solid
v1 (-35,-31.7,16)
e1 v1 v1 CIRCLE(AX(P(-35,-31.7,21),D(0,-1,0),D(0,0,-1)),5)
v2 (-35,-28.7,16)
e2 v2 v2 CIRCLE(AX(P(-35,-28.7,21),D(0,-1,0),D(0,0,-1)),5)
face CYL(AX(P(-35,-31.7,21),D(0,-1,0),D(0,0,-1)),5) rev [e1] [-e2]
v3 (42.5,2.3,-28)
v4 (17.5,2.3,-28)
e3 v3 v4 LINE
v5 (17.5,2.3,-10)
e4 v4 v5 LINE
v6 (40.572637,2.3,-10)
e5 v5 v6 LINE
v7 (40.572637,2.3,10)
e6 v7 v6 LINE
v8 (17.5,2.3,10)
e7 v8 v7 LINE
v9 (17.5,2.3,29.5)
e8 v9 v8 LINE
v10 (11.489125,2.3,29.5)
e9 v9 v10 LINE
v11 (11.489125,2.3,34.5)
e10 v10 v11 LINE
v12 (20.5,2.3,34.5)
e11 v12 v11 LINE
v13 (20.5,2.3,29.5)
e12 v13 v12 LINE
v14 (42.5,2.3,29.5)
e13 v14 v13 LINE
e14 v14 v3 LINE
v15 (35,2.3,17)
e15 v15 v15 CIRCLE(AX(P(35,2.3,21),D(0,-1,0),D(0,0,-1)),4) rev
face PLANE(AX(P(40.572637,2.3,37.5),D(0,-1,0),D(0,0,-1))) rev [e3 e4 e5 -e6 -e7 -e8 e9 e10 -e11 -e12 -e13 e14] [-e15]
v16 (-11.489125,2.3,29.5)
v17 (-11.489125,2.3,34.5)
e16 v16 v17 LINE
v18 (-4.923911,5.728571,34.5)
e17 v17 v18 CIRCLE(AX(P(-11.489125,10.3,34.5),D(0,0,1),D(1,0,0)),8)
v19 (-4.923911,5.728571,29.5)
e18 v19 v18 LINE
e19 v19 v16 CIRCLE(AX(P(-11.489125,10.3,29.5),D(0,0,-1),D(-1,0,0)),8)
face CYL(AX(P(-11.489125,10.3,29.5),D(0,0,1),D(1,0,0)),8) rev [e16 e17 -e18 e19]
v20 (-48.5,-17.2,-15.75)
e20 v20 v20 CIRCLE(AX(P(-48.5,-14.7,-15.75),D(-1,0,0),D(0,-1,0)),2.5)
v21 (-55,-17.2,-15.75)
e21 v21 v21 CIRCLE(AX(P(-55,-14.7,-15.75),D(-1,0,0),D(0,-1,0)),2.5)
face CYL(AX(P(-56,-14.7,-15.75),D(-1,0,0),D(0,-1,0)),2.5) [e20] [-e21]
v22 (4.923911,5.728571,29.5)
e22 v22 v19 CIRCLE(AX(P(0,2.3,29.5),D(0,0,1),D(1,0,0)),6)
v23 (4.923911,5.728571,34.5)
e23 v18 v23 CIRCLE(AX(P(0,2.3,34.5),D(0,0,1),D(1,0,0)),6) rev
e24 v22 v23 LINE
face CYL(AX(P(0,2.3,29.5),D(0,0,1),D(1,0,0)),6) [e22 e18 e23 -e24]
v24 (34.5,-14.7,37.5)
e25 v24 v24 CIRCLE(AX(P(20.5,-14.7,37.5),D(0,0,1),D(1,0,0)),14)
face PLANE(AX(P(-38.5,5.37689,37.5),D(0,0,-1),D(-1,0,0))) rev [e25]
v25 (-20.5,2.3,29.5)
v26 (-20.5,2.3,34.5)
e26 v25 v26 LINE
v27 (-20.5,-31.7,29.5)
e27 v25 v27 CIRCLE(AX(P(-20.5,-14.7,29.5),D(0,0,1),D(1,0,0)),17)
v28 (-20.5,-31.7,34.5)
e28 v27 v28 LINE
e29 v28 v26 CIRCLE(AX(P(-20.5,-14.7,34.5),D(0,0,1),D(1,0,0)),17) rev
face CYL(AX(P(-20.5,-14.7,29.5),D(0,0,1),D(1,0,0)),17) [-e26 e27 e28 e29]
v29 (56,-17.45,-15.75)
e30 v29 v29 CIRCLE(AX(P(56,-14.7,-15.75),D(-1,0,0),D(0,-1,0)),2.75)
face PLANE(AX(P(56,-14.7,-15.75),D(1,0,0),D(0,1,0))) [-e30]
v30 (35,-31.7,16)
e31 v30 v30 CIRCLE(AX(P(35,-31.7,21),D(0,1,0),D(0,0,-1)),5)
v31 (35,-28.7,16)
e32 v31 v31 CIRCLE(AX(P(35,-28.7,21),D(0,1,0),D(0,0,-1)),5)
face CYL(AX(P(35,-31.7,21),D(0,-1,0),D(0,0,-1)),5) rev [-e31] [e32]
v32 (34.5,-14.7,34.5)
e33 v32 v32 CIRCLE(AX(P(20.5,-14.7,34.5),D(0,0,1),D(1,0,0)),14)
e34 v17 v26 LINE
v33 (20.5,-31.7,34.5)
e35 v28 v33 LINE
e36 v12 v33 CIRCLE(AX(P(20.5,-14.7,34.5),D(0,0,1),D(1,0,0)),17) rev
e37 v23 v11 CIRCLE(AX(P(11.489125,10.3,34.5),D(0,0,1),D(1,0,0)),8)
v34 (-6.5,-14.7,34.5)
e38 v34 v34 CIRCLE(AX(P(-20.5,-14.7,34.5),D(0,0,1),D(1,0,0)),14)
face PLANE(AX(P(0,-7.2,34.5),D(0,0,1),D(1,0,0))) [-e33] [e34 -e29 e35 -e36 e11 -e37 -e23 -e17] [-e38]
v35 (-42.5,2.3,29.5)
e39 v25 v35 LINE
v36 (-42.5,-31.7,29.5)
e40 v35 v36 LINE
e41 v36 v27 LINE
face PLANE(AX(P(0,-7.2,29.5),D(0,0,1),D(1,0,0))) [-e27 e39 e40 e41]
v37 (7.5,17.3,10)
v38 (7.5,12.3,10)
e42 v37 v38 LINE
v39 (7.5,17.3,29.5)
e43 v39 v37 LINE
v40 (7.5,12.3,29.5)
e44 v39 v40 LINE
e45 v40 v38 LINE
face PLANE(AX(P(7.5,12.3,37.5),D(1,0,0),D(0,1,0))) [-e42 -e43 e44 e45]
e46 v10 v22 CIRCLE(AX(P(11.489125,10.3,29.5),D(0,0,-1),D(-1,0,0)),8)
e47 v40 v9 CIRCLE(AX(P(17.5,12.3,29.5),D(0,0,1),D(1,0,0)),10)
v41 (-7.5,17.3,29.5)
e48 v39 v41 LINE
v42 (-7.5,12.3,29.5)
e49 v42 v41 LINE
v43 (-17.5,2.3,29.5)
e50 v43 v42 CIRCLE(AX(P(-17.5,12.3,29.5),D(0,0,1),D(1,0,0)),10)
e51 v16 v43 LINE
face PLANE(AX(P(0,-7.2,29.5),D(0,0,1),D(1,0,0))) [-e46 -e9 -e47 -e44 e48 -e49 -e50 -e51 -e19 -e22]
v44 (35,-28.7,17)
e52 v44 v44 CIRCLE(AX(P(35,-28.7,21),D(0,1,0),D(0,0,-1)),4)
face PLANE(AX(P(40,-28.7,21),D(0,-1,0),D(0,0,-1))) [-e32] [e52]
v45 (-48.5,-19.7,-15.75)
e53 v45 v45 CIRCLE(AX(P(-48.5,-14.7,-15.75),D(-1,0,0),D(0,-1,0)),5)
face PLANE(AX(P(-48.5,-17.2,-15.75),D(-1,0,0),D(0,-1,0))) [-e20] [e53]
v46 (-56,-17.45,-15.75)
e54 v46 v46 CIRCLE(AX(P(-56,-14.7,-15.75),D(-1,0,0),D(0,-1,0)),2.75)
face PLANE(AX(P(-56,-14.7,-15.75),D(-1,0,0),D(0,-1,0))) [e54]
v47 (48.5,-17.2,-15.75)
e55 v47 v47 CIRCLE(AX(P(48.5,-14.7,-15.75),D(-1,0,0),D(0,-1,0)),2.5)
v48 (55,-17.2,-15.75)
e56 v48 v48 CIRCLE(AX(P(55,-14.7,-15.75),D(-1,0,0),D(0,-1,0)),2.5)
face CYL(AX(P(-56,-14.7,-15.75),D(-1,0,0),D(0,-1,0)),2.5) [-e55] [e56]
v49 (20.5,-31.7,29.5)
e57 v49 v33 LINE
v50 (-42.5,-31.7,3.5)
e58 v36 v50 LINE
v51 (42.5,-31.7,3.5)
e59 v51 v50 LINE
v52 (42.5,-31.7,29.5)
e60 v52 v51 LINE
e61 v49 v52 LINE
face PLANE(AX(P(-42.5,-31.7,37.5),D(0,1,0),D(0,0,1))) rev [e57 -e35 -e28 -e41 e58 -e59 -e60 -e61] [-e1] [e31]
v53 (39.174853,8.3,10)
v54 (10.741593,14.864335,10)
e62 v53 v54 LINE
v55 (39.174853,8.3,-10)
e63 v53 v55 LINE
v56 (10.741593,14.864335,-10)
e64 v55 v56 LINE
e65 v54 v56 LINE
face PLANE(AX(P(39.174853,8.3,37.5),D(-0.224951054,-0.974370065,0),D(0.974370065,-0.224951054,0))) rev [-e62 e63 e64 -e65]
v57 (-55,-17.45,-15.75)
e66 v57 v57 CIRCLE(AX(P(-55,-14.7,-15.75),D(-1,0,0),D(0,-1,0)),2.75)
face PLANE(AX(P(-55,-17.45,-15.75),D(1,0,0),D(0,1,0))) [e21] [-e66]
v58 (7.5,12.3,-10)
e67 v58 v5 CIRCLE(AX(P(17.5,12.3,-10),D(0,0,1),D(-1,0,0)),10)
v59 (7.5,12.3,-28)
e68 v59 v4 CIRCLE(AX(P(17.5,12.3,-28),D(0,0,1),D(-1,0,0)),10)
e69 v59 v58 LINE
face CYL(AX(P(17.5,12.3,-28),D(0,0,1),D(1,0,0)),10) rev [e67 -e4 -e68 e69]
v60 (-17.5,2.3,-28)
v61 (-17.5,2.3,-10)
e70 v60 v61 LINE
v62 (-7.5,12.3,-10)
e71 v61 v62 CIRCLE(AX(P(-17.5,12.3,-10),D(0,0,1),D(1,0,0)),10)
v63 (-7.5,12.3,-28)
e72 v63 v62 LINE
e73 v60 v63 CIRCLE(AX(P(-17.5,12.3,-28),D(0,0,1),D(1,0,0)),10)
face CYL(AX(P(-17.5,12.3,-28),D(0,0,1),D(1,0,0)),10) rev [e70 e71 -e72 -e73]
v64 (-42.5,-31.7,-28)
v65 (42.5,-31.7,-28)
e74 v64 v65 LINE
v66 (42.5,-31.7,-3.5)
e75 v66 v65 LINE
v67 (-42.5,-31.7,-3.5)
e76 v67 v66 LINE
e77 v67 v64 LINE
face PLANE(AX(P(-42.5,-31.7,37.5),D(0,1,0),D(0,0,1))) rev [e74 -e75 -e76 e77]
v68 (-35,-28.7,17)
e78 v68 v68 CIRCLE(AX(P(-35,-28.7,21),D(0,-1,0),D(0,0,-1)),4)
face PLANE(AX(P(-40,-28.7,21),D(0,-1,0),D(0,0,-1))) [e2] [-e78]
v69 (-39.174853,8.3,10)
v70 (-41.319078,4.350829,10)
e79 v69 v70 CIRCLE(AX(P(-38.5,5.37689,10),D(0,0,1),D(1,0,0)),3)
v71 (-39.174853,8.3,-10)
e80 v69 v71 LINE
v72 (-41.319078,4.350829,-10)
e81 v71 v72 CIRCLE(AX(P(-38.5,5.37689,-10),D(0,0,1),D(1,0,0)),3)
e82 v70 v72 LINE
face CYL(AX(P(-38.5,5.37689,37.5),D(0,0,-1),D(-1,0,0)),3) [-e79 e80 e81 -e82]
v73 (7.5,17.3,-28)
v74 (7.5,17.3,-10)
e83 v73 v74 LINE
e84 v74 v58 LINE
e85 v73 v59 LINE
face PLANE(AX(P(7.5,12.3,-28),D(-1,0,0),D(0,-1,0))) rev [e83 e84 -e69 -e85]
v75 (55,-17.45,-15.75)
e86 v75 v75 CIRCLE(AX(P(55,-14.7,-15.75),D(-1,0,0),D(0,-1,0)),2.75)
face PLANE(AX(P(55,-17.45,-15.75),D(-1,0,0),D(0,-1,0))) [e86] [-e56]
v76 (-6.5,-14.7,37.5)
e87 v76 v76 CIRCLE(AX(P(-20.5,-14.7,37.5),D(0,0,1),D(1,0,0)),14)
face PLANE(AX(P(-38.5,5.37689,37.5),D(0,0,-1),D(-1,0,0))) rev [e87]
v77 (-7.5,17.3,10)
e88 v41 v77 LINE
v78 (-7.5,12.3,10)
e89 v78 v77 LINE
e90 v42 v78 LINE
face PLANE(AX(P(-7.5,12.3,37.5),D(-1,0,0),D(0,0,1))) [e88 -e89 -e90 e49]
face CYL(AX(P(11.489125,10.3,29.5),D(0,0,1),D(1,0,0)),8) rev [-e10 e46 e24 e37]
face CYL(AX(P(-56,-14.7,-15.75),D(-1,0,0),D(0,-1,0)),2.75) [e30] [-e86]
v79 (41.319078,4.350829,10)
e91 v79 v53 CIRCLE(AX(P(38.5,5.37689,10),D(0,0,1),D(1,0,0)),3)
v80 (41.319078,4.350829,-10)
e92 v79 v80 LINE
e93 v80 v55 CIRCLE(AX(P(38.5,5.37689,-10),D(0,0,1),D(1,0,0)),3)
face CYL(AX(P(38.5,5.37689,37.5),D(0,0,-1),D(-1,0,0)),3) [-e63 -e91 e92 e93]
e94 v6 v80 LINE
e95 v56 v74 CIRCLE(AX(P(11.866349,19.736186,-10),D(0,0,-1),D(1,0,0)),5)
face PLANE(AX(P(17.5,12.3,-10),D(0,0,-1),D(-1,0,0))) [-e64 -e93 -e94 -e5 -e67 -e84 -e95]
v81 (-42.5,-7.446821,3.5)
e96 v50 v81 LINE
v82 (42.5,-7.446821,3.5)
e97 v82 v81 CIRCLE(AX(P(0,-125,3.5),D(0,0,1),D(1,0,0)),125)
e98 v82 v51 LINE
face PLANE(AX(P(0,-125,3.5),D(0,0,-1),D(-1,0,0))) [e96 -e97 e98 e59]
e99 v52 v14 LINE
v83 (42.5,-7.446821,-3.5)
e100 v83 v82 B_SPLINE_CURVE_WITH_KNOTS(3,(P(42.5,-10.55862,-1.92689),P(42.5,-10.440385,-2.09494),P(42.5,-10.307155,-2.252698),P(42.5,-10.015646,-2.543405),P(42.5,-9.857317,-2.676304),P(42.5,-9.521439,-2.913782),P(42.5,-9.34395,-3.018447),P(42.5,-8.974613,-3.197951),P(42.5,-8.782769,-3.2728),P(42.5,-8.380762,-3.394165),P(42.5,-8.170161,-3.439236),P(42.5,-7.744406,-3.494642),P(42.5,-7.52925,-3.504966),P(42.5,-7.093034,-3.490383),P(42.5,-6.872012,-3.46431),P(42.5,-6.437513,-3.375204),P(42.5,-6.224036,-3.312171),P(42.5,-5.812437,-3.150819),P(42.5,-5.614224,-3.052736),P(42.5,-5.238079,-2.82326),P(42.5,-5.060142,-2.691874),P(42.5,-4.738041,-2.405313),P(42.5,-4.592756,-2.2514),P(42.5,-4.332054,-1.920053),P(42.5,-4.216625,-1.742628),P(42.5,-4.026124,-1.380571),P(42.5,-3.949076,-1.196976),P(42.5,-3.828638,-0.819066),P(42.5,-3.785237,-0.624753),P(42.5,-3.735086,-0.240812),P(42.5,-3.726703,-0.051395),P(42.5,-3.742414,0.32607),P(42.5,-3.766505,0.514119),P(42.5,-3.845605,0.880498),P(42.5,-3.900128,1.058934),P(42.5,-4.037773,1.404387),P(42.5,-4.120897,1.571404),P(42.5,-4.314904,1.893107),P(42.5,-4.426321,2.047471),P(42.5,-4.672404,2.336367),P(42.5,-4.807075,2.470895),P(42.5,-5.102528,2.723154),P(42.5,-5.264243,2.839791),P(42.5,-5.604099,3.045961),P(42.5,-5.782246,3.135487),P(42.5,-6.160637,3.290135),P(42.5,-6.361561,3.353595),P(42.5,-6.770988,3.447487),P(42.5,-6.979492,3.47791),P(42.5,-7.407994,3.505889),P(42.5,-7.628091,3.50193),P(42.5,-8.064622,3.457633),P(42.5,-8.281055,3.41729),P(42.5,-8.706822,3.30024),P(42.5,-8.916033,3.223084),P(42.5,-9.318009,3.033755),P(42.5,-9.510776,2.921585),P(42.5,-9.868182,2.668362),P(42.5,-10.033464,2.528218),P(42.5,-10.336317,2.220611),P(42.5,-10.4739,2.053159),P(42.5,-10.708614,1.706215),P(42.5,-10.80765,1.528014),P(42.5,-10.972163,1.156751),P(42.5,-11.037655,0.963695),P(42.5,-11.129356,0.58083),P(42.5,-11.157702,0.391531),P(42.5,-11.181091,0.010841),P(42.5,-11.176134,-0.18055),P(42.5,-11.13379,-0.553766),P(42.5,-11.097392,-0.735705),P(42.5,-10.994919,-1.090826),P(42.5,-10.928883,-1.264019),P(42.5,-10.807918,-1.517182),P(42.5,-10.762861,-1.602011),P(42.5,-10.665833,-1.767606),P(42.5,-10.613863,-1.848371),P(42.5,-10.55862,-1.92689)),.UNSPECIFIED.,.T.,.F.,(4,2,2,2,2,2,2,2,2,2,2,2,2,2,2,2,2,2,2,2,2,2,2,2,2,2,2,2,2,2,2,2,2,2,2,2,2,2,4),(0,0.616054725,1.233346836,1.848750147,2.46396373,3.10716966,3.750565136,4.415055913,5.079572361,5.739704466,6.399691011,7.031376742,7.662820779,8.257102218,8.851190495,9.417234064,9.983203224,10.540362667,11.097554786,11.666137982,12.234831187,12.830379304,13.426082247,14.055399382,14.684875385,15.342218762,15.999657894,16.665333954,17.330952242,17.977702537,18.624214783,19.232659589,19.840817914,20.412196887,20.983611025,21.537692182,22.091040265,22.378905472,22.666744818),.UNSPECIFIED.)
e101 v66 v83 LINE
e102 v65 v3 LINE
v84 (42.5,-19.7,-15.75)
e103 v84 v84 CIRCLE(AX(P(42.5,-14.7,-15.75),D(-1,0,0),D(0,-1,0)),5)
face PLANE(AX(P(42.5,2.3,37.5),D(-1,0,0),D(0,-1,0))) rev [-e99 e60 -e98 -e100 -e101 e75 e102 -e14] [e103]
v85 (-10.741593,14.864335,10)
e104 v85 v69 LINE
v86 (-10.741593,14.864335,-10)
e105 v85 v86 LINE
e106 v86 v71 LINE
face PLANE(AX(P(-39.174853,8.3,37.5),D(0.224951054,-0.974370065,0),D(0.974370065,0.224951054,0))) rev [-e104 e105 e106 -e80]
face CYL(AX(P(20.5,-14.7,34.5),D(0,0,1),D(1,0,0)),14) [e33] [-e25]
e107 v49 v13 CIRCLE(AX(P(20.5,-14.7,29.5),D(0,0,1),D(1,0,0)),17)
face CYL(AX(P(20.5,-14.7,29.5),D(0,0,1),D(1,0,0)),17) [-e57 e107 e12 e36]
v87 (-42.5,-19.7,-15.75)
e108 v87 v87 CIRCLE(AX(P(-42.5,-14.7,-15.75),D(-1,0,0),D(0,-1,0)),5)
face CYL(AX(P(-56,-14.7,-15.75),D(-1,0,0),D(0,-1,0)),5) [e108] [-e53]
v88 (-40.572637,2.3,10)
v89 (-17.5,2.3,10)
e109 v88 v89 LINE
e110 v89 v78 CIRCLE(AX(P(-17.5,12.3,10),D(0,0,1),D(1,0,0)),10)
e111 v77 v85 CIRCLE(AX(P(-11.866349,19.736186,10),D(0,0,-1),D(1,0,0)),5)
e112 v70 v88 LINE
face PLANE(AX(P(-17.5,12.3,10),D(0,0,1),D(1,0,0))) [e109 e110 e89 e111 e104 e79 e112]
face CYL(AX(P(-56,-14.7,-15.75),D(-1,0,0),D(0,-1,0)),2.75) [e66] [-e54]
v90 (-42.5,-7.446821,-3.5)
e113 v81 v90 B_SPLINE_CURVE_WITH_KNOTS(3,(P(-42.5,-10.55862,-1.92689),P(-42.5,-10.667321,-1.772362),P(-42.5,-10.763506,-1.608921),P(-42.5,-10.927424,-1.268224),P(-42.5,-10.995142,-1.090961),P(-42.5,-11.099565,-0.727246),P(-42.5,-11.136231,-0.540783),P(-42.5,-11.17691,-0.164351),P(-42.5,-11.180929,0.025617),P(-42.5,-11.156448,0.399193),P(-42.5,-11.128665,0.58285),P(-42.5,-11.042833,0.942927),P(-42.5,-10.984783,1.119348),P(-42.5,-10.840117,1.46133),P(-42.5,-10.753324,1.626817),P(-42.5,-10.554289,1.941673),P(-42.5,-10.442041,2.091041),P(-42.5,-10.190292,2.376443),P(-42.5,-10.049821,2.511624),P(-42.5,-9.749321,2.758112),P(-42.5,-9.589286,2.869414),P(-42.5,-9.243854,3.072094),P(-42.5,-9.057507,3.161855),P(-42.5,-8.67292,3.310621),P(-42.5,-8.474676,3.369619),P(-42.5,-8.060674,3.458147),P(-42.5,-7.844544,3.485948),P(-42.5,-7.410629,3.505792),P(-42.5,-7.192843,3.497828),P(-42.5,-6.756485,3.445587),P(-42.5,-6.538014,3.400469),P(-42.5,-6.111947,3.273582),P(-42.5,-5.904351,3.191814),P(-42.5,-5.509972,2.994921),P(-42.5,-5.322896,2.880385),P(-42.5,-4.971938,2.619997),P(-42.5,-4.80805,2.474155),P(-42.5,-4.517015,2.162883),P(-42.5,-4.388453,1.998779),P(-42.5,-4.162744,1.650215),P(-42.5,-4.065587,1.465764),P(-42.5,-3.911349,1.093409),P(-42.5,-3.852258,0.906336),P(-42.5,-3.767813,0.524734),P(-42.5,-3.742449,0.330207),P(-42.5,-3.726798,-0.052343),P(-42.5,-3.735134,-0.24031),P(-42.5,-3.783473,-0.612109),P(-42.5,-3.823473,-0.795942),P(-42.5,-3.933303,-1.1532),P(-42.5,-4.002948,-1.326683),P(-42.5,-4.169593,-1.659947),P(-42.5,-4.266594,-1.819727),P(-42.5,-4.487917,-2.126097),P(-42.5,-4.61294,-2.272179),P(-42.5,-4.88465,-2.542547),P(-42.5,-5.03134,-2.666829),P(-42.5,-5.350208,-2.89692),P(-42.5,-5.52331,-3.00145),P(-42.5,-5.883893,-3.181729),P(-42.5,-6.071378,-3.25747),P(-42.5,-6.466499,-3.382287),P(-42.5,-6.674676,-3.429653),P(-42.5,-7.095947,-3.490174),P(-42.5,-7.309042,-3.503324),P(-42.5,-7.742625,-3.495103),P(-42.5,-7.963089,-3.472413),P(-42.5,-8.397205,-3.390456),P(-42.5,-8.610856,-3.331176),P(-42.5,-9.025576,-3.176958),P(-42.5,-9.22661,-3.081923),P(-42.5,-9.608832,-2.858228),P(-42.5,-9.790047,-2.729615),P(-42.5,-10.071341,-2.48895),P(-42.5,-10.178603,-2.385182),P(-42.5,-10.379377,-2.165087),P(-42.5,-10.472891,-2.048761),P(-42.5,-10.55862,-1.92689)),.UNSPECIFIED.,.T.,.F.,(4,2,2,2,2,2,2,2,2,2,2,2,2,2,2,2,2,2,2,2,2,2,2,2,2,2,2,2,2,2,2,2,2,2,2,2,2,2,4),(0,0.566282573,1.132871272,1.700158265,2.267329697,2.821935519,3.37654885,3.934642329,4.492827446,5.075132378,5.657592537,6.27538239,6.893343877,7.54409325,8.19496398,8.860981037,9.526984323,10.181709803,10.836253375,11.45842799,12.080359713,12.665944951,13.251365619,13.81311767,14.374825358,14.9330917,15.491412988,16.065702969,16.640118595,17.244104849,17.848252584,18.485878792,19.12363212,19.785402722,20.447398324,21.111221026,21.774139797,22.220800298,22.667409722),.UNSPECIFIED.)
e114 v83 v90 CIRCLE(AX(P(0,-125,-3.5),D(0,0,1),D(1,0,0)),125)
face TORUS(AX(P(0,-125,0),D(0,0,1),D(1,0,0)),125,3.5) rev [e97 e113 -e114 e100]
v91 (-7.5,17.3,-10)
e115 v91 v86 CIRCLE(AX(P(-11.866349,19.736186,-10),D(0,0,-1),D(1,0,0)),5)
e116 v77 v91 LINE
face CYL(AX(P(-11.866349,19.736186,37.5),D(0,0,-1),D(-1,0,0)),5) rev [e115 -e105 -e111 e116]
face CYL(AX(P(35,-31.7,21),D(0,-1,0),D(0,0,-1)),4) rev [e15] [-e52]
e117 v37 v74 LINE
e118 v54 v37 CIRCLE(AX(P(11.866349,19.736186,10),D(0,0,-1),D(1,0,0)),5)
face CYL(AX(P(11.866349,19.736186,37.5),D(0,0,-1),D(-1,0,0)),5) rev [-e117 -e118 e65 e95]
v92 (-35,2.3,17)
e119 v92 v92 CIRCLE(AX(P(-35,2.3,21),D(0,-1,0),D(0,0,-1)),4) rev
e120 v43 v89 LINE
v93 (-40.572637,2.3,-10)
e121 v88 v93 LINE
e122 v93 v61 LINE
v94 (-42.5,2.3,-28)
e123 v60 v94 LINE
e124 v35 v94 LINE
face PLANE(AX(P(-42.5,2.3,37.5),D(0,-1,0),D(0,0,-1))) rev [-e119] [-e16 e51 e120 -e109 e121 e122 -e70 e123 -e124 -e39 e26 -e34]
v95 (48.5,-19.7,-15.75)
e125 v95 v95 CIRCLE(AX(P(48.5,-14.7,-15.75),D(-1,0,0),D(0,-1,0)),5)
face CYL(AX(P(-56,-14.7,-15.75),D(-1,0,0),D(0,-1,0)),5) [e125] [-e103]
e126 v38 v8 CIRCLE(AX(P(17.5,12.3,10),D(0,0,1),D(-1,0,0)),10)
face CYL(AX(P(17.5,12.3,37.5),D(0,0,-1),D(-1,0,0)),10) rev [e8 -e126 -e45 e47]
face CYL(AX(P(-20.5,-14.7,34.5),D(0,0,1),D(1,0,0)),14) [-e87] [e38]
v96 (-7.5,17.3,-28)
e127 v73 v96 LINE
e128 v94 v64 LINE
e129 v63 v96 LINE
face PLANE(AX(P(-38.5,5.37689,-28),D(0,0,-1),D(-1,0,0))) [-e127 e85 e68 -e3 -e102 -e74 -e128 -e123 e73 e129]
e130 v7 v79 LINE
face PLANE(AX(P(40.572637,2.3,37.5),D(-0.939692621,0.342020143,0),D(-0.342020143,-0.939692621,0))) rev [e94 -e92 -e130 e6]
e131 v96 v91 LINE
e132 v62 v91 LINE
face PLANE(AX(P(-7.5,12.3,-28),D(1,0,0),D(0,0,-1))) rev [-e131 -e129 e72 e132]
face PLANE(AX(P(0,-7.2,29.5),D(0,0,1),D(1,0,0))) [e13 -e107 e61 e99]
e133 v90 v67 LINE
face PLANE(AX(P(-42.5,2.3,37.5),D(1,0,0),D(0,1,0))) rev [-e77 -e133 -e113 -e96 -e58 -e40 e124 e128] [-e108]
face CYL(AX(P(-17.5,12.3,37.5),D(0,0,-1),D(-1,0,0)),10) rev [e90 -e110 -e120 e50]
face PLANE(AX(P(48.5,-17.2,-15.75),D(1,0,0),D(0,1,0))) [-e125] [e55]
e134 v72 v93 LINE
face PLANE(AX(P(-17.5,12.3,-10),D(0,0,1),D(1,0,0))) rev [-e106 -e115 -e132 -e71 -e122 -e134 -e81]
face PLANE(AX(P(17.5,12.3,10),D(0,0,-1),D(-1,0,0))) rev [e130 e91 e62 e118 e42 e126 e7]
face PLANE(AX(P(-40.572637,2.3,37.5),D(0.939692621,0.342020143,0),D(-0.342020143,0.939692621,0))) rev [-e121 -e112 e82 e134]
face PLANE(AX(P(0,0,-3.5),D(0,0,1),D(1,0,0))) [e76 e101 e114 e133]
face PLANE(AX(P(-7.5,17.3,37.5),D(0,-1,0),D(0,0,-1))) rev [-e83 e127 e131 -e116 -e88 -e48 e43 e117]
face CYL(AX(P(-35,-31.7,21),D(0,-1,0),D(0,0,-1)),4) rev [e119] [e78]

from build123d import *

# Parameters (mm, degrees)
BOSS_EXTRUDE1_DEPTH      = 37.5
BOSS_EXTRUDE1_DEPTH_BACK = 28
CUT_EXTRUDE2_START       = -28
CUT_EXTRUDE2_DEPTH       = 18
CUT_EXTRUDE3_START       = 10
CUT_EXTRUDE3_DEPTH       = 27.5
SKETCH6_OUTSIDE_W        = 110.594
SKETCH6_OUTSIDE_H        = 74.594
CUT_EXTRUDE4_DEPTH       = 8
SKETCH7_OUTSIDE_W        = 110.594
SKETCH7_OUTSIDE_H        = 74.594
SKETCH7_OUTSIDE_R        = 14
CUT_EXTRUDE5_DEPTH       = 3


# Read off the part's stored shape, not the designer's step: Cut-Extrude2, Cut-Extrude3
with BuildPart() as part:
    # Sketch1 → Boss-Extrude1 (new, two sides: drawn at the far end of the back side and taken through both)
    with BuildSketch(Plane.XY.offset(-BOSS_EXTRUDE1_DEPTH_BACK)):
        with BuildLine():
            Line((-42.5, 2.3), (-40.572637014, 2.3))
            Line((-40.572637014, 2.3), (-41.319077862, 4.350829376))
            ThreePointArc((-41.319077862, 4.350829376), (-41.136451338, 6.808366086), (-39.174853163, 8.3))
            Line((-39.174853163, 8.3), (-10.741593286, 14.864335276))
            ThreePointArc((-10.741593286, 14.864335276), (-8.862822134, 15.738832848), (-7.5, 17.3))
            Line((-7.5, 17.3), (7.5, 17.3))
            ThreePointArc((7.5, 17.3), (8.862822134, 15.738832848), (10.741593286, 14.864335276))
            Line((10.741593286, 14.864335276), (39.174853163, 8.3))
            ThreePointArc((39.174853163, 8.3), (41.136451338, 6.808366086), (41.319077862, 4.350829376))
            Line((41.319077862, 4.350829376), (40.572637014, 2.3))
            Line((40.572637014, 2.3), (42.5, 2.3))
            Line((42.5, 2.3), (42.5, -31.7))
            Line((42.5, -31.7), (-42.5, -31.7))
            Line((-42.5, -31.7), (-42.5, 2.3))
        make_face()
    extrude(amount=BOSS_EXTRUDE1_DEPTH + BOSS_EXTRUDE1_DEPTH_BACK)

    # Sketch2 → Cut-Revolve1 (revolve, cut)
    with BuildSketch(Plane(origin=(0, 0, 0), x_dir=(0, 0, -1), z_dir=(1, 0, 0))):
        with BuildLine():
            Line((-3.5, -125), (-3.5, 0))
            ThreePointArc((-3.5, 0), (0, 3.5), (3.5, 0))
            Line((3.5, 0), (3.5, -125))
            Line((3.5, -125), (-3.5, -125))
        make_face()
    revolve(axis=Axis((0, -125, 37.5), (0, 0, -1)), mode=Mode.SUBTRACT)

    # Cut-Extrude2 outline → Cut-Extrude2 (cut)
    with BuildSketch(Plane.XY.offset(CUT_EXTRUDE2_START)):
        with BuildLine():
            ThreePointArc((7.5, 12.3), (10.428932188, 5.228932188), (17.5, 2.3))
            Line((17.5, 2.3), (40.572637014, 2.3))
            Line((40.572637014, 2.3), (41.319077862, 4.350829376))
            ThreePointArc((41.319077862, 4.350829376), (41.136451338, 6.808366087), (39.174853163, 8.3))
            Line((39.174853163, 8.3), (10.741593286, 14.864335276))
            ThreePointArc((10.741593286, 14.864335276), (8.862822134, 15.738832848), (7.5, 17.3))
            Line((7.5, 17.3), (7.5, 12.3))
        make_face()
        with BuildLine():
            Line((-41.319077862, 4.350829376), (-40.572637014, 2.3))
            Line((-40.572637014, 2.3), (-17.5, 2.3))
            ThreePointArc((-17.5, 2.3), (-10.428932188, 5.228932188), (-7.5, 12.3))
            Line((-7.5, 12.3), (-7.5, 17.3))
            ThreePointArc((-7.5, 17.3), (-8.862822134, 15.738832848), (-10.741593286, 14.864335276))
            Line((-10.741593286, 14.864335276), (-39.174853163, 8.3))
            ThreePointArc((-39.174853163, 8.3), (-41.136451338, 6.808366087), (-41.319077862, 4.350829376))
        make_face()
    extrude(amount=CUT_EXTRUDE2_DEPTH, mode=Mode.SUBTRACT)

    # Cut-Extrude3 outline → Cut-Extrude3 (cut)
    with BuildSketch(Plane.XY.offset(CUT_EXTRUDE3_START)):
        with BuildLine():
            ThreePointArc((7.5, 12.3), (10.428932188, 5.228932188), (17.5, 2.3))
            Line((17.5, 2.3), (40.572637014, 2.3))
            Line((40.572637014, 2.3), (41.319077862, 4.350829376))
            ThreePointArc((41.319077862, 4.350829376), (41.136451338, 6.808366087), (39.174853163, 8.3))
            Line((39.174853163, 8.3), (10.741593286, 14.864335276))
            ThreePointArc((10.741593286, 14.864335276), (8.862822134, 15.738832848), (7.5, 17.3))
            Line((7.5, 17.3), (7.5, 12.3))
        make_face()
        with BuildLine():
            Line((-41.319077862, 4.350829376), (-40.572637014, 2.3))
            Line((-40.572637014, 2.3), (-17.5, 2.3))
            ThreePointArc((-17.5, 2.3), (-10.428932188, 5.228932188), (-7.5, 12.3))
            Line((-7.5, 12.3), (-7.5, 17.3))
            ThreePointArc((-7.5, 17.3), (-8.862822134, 15.738832848), (-10.741593286, 14.864335276))
            Line((-10.741593286, 14.864335276), (-39.174853163, 8.3))
            ThreePointArc((-39.174853163, 8.3), (-41.136451338, 6.808366087), (-41.319077862, 4.350829376))
        make_face()
    extrude(amount=CUT_EXTRUDE3_DEPTH, mode=Mode.SUBTRACT)

    # Sketch5 → Cut-Revolve2 (revolve, cut)
    with BuildSketch(Plane.XY.offset(21), mode=Mode.PRIVATE) as cut_revolve2_sk:
        Polygon((-35, -31.7), (-40, -31.7), (-40, -28.7), (-39, -28.7), (-39, 17.3), (-35, 17.3), align=None)
    cut_revolve2 = revolve(cut_revolve2_sk.sketch.rotate(Axis((-35, -31.7, 21), (0, 1, 0)), 270), axis=Axis((-35, -31.7, 21), (0, 1, 0)), mode=Mode.SUBTRACT)

    # Mirror1: Cut-Revolve2 across plane
    add(cut_revolve2.mirror(Plane(origin=(0, 0, 0), x_dir=(0, 0, 1), z_dir=(1, 0, 0))), mode=Mode.SUBTRACT)

    # Sketch6 outside → Cut-Extrude4 (cut)
    with BuildSketch(Plane.XY.offset(37.5)):
        with Locations((0, -7.2)):
            Rectangle(SKETCH6_OUTSIDE_W, SKETCH6_OUTSIDE_H)
        with BuildLine():
            Line((20.5, 2.3), (11.489125293, 2.3))
            ThreePointArc((11.489125293, 2.3), (7.785844894, 3.208757917), (4.92391084, 5.728571429))
            ThreePointArc((4.92391084, 5.728571429), (0, 8.3), (-4.92391084, 5.728571429))
            ThreePointArc((-4.92391084, 5.728571429), (-7.785844894, 3.208757917), (-11.489125293, 2.3))
            Line((-11.489125293, 2.3), (-20.5, 2.3))
            ThreePointArc((-20.5, 2.3), (-37.5, -14.7), (-20.5, -31.7))
            Line((-20.5, -31.7), (20.5, -31.7))
            ThreePointArc((20.5, -31.7), (37.5, -14.7), (20.5, 2.3))
        make_face(mode=Mode.SUBTRACT)
    extrude(amount=-CUT_EXTRUDE4_DEPTH, mode=Mode.SUBTRACT)

    # Sketch7 outside → Cut-Extrude5 (cut)
    with BuildSketch(Plane.XY.offset(37.5)):
        with Locations((0, -7.2)):
            Rectangle(SKETCH7_OUTSIDE_W, SKETCH7_OUTSIDE_H)
        with Locations((-20.5, -14.7)):
            Circle(SKETCH7_OUTSIDE_R, mode=Mode.SUBTRACT)
        with Locations((20.5, -14.7)):
            Circle(SKETCH7_OUTSIDE_R, mode=Mode.SUBTRACT)
    extrude(amount=-CUT_EXTRUDE5_DEPTH, mode=Mode.SUBTRACT)

    # Sketch8 → Revolve1 (revolve)
    with BuildSketch(Plane.XY.offset(-15.75)):
        Polygon((-56, -14.7), (-56, -17.45), (-55, -17.45), (-55, -17.2), (-48.5, -17.2), (-48.5, -19.7), (-42.5, -19.7), (-42.5, -14.7), align=None)
        Polygon((42.5, -19.7), (42.5, -14.7), (56, -14.7), (56, -17.45), (55, -17.45), (55, -17.2), (48.5, -17.2), (48.5, -19.7), align=None)
    revolve(axis=Axis((-56, -14.7, -15.75), (1, 0, 0)))


solid = part.part
